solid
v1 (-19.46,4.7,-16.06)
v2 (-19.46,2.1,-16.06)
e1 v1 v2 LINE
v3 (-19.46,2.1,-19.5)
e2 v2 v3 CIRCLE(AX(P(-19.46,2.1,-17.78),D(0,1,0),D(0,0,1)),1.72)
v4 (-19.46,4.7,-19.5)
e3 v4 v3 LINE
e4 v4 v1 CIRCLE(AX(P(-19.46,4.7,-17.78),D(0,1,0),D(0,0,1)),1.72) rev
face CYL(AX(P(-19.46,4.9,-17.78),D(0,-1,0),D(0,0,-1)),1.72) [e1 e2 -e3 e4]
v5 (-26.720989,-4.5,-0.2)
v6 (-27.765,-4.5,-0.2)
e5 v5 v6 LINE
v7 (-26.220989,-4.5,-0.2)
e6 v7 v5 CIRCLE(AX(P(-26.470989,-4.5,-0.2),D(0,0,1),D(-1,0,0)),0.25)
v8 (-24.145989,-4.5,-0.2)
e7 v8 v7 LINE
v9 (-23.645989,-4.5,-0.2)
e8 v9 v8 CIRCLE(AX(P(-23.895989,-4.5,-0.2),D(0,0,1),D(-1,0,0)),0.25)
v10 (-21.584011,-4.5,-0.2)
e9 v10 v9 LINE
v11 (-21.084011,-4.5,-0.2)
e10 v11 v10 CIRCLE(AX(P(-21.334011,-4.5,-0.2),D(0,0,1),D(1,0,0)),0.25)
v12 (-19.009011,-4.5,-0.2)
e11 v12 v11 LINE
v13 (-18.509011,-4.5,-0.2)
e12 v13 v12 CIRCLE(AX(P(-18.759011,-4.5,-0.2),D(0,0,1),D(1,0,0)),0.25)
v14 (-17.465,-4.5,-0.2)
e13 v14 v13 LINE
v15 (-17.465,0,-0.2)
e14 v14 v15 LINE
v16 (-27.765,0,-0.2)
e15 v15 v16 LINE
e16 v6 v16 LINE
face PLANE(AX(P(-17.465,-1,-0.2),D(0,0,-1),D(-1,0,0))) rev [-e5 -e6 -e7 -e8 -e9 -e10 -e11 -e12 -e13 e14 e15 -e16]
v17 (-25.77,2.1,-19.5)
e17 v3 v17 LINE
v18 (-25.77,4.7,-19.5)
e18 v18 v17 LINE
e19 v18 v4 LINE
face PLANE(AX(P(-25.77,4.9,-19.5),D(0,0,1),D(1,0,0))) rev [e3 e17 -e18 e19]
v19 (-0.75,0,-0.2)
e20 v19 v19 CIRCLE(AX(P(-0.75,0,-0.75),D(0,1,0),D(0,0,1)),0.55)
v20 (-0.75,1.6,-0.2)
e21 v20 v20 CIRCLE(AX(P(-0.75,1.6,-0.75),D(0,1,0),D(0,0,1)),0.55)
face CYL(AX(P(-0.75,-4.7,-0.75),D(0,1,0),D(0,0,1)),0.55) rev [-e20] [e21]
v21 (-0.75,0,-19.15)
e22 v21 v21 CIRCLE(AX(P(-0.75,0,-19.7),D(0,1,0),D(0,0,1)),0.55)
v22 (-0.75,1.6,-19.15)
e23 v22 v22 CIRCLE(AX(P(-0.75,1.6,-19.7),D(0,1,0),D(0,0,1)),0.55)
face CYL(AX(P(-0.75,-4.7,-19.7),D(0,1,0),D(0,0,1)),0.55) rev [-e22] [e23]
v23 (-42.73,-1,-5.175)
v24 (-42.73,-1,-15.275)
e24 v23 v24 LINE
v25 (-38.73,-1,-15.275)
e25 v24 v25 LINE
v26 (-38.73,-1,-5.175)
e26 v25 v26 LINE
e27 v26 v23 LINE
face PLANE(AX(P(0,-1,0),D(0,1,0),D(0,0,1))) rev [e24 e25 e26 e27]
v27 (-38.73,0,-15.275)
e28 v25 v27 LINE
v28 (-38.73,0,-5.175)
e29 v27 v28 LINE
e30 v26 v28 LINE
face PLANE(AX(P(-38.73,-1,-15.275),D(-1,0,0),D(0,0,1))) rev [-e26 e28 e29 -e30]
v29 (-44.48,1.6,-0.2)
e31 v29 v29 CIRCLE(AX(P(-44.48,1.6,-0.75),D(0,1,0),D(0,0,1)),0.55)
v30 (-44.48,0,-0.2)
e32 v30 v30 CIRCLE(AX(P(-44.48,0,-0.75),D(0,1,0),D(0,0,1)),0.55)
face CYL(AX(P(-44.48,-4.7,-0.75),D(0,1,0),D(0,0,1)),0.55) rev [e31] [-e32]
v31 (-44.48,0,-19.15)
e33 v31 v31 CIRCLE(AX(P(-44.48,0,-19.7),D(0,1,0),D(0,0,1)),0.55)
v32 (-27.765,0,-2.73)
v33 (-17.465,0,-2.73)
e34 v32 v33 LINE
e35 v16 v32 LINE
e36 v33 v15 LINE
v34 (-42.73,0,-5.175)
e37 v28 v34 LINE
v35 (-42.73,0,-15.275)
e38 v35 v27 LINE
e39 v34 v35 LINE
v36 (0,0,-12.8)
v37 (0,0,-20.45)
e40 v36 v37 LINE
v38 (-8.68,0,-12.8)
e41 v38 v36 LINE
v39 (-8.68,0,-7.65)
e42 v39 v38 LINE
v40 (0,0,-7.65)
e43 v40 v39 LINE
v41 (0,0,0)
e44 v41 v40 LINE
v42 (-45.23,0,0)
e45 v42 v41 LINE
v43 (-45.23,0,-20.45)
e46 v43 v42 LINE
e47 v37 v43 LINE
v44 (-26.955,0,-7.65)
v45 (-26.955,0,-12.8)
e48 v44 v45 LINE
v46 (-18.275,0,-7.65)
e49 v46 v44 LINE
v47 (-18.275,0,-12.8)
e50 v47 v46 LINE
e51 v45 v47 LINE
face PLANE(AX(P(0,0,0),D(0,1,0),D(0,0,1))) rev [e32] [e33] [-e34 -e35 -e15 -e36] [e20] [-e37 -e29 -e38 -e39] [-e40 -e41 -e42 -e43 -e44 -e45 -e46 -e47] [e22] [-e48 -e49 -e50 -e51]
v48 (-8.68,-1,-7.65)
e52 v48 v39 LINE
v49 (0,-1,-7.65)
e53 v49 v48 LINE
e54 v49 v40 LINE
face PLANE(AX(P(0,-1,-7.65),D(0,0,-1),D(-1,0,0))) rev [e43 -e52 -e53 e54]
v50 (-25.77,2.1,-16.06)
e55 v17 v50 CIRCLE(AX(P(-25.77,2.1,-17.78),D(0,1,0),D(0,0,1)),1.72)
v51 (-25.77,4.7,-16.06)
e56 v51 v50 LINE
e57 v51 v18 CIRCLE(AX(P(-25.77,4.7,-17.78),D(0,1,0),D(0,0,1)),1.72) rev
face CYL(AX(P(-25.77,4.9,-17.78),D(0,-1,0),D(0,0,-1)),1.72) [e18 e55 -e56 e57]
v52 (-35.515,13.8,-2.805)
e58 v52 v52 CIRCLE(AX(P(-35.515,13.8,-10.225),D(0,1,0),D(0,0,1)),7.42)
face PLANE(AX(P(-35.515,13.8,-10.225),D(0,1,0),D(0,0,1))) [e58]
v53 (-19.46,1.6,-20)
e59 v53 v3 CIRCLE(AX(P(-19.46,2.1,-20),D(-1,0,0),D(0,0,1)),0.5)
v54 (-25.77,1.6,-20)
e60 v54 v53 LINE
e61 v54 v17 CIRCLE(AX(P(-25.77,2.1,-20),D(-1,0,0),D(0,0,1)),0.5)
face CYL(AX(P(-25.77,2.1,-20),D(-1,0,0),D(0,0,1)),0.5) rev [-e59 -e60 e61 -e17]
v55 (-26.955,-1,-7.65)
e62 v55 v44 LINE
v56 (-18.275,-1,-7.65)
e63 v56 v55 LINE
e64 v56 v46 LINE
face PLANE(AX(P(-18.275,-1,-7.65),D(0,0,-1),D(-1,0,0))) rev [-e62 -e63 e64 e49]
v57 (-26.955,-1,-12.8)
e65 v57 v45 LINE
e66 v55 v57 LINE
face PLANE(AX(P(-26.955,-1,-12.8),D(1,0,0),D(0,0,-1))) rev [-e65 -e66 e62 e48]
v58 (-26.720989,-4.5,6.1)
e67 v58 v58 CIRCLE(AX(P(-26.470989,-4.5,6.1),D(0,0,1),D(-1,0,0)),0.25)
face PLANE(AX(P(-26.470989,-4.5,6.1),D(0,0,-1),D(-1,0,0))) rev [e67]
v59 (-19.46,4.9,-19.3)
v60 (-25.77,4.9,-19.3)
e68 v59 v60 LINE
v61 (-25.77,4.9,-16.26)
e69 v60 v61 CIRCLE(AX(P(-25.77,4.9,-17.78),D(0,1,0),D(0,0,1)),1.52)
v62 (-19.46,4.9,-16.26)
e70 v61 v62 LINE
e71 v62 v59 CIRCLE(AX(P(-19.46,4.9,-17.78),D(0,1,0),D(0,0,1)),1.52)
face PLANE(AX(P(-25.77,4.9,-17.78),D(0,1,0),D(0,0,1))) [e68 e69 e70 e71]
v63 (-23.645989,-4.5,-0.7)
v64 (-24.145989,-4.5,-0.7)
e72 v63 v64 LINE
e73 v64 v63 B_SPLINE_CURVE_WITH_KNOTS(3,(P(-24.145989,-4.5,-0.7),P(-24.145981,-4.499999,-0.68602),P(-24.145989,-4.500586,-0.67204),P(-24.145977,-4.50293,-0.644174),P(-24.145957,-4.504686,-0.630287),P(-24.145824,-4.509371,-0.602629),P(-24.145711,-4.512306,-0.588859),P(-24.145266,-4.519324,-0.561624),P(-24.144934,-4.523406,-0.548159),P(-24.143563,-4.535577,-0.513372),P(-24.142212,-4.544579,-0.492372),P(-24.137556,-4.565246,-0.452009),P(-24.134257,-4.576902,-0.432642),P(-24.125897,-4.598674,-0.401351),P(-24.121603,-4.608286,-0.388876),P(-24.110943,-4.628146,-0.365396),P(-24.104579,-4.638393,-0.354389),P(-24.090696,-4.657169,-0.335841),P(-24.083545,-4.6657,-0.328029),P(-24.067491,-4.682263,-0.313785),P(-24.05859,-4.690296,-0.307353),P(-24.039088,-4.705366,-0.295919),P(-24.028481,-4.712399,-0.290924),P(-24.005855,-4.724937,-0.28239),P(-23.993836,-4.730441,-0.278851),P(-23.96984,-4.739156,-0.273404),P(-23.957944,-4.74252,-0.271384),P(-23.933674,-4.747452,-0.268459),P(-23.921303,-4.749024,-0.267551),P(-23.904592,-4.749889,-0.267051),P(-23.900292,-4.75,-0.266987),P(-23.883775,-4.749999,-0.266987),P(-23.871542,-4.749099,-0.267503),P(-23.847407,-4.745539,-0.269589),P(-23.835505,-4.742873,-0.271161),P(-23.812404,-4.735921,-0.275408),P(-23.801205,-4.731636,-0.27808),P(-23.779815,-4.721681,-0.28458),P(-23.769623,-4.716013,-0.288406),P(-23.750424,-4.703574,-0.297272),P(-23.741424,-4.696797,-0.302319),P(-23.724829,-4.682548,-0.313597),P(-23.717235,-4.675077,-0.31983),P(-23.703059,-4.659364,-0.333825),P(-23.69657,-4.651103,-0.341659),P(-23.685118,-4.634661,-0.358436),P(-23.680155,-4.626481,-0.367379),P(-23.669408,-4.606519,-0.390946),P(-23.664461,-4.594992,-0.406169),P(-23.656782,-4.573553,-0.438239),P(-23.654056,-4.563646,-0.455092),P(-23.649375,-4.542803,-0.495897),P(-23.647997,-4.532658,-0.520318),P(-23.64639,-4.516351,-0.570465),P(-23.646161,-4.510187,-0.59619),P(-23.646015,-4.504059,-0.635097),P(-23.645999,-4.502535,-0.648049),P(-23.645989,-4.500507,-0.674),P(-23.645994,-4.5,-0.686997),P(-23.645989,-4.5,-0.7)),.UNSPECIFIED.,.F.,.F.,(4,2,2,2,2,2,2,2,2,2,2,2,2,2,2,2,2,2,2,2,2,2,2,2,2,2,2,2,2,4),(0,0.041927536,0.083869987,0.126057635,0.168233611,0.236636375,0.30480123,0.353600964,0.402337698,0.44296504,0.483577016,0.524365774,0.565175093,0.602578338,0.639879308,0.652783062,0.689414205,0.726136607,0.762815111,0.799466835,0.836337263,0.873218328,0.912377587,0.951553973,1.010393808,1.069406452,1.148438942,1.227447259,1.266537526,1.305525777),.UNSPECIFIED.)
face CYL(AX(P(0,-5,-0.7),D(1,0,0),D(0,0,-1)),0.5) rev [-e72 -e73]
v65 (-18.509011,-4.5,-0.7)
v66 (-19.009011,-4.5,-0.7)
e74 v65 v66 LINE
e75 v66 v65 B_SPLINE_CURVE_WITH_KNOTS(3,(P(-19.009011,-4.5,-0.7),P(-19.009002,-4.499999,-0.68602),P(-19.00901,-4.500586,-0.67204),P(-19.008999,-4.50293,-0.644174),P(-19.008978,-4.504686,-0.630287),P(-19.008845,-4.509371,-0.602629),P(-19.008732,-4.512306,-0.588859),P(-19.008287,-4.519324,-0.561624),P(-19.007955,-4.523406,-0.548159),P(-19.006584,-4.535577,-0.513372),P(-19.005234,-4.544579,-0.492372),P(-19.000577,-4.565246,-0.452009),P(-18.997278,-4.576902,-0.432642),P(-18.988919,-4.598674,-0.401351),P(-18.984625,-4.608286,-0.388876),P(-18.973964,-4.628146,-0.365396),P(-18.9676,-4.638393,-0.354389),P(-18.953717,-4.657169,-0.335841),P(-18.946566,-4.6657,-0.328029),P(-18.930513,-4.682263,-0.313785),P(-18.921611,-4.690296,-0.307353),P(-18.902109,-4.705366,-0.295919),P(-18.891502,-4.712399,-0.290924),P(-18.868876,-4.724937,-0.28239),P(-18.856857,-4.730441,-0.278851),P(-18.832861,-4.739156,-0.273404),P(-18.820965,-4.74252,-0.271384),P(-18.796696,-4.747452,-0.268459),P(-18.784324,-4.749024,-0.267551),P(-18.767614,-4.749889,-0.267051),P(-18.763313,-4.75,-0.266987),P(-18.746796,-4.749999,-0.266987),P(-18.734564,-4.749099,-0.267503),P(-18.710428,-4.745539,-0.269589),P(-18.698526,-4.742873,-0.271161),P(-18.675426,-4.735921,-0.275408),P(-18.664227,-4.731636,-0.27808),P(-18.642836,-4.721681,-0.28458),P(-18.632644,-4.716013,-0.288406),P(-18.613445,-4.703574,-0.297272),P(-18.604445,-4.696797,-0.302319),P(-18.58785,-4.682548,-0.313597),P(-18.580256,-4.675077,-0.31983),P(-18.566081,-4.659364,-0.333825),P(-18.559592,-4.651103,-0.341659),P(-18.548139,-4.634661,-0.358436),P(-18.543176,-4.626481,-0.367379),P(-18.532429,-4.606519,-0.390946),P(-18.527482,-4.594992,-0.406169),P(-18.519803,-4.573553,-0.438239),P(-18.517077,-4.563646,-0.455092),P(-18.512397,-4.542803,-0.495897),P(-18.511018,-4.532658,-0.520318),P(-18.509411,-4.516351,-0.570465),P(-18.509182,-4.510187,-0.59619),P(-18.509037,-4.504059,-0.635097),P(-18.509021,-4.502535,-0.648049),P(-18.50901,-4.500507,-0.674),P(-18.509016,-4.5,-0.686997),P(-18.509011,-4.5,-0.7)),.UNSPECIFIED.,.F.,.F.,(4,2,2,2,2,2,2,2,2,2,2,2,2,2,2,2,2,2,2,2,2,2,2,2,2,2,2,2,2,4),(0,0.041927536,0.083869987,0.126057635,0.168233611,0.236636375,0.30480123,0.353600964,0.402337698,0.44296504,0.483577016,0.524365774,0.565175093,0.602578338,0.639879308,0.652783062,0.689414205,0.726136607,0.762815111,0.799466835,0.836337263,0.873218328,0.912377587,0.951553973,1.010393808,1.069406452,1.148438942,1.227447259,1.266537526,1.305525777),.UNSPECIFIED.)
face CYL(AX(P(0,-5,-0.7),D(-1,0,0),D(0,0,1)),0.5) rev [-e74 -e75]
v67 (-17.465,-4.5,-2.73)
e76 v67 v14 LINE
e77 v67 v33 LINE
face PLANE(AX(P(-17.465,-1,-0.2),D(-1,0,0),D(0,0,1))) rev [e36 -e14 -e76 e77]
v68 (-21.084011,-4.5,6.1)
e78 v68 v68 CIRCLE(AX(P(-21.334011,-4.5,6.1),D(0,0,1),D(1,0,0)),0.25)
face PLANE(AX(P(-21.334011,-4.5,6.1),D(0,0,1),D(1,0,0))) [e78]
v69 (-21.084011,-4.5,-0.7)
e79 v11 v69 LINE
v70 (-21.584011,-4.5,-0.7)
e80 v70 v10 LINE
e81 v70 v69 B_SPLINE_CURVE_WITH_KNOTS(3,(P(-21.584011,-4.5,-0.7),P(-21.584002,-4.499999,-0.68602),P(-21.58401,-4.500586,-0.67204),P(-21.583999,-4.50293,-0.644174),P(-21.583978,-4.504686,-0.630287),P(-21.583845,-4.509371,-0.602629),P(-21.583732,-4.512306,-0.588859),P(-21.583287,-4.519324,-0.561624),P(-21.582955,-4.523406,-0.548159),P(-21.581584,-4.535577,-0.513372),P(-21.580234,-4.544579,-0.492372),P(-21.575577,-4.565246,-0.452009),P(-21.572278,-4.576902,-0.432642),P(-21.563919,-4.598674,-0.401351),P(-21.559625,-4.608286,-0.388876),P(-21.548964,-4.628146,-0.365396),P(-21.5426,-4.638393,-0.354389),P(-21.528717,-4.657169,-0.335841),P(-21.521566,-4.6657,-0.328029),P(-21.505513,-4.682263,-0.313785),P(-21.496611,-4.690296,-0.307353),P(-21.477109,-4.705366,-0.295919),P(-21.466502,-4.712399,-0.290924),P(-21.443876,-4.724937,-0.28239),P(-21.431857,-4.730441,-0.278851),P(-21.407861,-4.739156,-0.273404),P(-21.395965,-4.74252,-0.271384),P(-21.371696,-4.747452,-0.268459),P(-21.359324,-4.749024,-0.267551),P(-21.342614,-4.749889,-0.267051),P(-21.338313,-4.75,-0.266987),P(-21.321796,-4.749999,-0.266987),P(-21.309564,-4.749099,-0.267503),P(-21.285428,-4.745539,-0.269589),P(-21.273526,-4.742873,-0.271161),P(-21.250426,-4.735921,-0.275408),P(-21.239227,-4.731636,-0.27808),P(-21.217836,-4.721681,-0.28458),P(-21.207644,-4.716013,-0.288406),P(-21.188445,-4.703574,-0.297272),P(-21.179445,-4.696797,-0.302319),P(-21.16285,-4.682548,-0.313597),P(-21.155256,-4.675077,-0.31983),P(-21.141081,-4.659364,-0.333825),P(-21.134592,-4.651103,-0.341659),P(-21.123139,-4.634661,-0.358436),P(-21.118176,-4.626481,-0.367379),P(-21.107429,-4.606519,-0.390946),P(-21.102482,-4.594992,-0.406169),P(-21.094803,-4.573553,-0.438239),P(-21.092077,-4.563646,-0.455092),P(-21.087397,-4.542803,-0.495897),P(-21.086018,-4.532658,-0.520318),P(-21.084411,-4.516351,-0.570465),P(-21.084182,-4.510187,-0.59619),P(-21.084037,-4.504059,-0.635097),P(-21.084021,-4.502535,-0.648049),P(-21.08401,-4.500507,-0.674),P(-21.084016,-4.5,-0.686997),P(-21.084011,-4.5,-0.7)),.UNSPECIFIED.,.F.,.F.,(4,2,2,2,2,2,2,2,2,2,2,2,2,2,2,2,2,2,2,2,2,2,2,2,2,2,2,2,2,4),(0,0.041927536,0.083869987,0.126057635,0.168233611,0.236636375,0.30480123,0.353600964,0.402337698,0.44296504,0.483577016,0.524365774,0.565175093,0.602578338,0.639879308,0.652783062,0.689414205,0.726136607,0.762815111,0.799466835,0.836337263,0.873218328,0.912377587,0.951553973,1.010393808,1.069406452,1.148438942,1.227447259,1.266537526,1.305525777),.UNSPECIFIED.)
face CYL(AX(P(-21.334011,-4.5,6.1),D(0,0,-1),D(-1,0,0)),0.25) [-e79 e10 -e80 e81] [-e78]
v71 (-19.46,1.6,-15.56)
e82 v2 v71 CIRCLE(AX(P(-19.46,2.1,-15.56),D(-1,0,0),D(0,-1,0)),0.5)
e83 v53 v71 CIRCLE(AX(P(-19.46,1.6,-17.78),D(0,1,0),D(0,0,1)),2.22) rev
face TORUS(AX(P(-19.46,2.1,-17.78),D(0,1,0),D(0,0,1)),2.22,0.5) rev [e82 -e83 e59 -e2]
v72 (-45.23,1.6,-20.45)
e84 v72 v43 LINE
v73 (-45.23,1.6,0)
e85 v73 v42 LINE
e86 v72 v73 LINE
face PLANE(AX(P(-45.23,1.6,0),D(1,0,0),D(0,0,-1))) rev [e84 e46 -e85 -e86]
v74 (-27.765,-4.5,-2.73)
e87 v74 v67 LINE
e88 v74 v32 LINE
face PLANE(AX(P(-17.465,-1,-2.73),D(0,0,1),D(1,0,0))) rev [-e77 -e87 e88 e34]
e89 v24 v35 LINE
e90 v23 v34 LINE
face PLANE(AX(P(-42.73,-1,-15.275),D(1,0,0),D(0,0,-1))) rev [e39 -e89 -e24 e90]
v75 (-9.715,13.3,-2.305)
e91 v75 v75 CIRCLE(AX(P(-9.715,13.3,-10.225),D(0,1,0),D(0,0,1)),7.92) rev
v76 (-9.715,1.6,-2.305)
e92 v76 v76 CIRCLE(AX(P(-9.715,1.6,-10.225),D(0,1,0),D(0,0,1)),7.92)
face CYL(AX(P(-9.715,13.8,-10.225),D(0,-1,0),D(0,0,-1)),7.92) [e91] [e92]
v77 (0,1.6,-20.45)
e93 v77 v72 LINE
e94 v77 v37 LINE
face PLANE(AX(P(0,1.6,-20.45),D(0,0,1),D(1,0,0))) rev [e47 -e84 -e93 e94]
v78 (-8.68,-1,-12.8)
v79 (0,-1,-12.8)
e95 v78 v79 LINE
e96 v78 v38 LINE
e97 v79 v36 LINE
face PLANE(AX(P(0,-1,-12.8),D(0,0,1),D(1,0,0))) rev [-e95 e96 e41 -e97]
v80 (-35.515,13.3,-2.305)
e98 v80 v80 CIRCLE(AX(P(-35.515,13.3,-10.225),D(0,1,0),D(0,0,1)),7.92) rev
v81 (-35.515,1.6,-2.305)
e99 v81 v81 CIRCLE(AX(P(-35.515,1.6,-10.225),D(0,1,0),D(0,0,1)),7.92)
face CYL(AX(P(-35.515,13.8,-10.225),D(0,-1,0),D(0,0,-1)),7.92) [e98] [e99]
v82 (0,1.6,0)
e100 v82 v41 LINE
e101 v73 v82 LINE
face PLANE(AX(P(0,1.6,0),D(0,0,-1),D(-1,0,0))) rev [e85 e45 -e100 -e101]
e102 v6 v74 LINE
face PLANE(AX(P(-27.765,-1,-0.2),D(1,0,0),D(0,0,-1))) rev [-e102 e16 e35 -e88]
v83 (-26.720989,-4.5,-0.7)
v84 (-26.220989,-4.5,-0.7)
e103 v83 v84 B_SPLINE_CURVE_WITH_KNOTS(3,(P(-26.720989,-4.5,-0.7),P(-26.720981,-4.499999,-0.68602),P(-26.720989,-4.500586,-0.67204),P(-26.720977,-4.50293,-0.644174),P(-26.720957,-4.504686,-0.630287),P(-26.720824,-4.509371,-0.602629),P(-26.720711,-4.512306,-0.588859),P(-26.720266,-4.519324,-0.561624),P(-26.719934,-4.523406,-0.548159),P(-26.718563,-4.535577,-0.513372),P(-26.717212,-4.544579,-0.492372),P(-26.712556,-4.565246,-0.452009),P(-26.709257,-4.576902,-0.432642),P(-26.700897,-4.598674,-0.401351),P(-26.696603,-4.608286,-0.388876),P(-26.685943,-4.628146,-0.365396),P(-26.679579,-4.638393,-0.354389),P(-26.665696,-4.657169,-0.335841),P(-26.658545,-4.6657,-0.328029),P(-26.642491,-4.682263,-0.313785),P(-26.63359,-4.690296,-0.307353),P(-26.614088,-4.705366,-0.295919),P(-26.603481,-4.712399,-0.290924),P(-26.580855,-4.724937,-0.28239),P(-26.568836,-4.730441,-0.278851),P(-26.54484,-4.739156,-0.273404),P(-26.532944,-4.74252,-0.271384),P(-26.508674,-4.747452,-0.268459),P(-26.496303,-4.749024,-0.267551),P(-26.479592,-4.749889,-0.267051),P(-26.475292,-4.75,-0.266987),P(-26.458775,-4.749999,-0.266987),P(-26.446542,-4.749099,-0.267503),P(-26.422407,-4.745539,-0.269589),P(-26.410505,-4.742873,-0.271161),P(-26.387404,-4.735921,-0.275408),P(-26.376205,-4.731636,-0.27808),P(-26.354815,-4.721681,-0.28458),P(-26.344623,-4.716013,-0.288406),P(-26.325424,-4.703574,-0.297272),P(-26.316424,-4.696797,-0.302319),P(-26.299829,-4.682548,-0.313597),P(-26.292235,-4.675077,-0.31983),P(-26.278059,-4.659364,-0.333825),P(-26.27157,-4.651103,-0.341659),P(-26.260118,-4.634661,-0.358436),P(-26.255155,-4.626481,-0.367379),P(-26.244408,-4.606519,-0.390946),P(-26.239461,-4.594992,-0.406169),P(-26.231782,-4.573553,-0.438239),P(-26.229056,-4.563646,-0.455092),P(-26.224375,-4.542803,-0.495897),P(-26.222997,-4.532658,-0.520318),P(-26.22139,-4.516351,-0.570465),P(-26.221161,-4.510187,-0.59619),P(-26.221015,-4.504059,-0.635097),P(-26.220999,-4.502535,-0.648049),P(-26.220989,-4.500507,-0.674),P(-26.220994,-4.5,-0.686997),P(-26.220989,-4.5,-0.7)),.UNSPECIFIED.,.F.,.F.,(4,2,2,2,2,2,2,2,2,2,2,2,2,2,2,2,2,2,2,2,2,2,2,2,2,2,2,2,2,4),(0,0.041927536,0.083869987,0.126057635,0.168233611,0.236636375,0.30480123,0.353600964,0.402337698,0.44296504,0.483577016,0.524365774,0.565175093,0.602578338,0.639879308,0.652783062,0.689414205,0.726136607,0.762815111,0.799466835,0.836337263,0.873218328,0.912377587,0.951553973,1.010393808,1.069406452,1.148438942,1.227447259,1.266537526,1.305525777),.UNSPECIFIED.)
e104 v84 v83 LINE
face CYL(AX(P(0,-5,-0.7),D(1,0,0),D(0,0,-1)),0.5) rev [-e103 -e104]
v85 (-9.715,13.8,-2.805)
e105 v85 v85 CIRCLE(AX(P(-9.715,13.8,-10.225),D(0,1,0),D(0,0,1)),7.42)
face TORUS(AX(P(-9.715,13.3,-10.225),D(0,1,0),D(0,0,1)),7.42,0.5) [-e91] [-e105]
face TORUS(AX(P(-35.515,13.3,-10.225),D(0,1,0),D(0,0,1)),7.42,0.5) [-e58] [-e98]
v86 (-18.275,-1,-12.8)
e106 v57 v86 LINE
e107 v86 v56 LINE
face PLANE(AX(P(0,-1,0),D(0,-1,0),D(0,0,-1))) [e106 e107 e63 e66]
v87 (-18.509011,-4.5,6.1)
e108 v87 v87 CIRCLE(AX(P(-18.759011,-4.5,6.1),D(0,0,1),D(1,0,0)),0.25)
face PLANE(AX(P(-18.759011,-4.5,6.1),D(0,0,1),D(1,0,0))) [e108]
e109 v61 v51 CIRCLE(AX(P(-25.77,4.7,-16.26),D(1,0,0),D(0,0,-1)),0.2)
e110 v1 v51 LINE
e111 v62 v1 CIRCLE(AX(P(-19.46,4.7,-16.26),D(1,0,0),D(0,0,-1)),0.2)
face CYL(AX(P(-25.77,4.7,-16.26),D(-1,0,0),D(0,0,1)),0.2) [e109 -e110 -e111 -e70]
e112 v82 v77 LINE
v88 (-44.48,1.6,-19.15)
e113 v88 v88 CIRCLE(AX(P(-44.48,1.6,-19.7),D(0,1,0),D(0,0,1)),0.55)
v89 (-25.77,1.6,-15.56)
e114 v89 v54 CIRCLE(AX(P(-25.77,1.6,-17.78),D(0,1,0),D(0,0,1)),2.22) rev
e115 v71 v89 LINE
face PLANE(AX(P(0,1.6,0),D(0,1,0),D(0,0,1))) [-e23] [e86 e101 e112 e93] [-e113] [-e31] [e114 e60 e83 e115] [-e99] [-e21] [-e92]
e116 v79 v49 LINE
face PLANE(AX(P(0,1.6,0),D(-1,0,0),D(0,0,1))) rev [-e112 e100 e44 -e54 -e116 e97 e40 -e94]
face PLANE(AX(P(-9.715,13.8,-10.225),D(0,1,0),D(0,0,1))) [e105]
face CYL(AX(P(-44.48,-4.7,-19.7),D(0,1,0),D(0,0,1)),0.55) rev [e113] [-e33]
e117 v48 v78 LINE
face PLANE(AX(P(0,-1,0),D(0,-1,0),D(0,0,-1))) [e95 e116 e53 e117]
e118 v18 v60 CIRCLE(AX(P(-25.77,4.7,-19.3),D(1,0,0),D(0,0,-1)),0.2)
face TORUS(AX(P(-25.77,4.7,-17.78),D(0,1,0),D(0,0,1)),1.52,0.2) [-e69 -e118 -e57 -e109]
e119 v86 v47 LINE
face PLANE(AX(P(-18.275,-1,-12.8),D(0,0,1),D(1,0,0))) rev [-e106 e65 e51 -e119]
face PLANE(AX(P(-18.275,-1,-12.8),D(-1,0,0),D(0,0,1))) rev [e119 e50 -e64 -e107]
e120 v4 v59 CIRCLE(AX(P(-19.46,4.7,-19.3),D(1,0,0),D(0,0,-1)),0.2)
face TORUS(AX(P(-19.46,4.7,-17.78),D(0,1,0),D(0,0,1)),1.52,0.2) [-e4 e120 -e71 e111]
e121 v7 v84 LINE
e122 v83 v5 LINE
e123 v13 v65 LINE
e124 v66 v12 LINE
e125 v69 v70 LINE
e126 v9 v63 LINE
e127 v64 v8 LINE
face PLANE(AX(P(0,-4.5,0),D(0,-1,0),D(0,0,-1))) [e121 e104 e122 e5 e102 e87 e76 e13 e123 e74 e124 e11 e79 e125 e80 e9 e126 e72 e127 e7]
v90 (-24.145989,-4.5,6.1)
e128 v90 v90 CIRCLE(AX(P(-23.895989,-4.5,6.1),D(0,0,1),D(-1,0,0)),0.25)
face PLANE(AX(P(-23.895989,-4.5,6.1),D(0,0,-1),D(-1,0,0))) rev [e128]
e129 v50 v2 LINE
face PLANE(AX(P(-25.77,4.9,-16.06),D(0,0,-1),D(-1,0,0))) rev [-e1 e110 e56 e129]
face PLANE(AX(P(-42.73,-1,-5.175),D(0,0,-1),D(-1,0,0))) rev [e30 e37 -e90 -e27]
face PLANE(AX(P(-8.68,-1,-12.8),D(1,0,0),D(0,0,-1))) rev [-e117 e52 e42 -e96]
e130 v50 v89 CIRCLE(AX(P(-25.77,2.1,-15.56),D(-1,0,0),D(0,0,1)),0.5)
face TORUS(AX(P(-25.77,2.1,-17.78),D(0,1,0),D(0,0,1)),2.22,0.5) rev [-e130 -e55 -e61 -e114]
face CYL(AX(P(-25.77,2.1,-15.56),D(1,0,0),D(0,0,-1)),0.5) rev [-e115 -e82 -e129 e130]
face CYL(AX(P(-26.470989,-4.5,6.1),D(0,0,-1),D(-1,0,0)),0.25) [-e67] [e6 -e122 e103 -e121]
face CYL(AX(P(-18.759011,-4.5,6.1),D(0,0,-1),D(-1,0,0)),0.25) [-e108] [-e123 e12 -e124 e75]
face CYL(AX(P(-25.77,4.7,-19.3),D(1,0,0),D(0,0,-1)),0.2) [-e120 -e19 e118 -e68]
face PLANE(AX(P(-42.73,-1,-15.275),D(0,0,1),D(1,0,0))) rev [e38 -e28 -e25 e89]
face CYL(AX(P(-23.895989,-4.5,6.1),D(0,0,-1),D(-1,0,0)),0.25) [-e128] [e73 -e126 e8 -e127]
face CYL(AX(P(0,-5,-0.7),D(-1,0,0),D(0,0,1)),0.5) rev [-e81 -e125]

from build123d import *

# Parameters (mm, degrees)
SKETCH1_W           = 45.23
SKETCH1_H           = 20.45
BOSS_EXTRUDE1_DEPTH = 1.6
SKETCH2_R           = 7.92
BOSS_EXTRUDE2_DEPTH = 12.2
BOSS_EXTRUDE3_DEPTH = 3.3
SKETCH4_W           = 4
SKETCH4_H           = 10.1
SKETCH4_W_2         = 8.68
SKETCH4_H_2         = 5.15
SKETCH4_W_3         = 10.3
SKETCH4_H_3         = 2.53
BOSS_EXTRUDE4_DEPTH = 1
SKETCH5_W           = 10.3
SKETCH5_H           = 2.53
BOSS_EXTRUDE5_DEPTH = 3.5
SKETCH6_R           = 0.25
BOSS_EXTRUDE6_DEPTH = 6.3
FILLET1_R           = 0.5
FILLET2_R           = 0.5
FILLET3_R           = 0.2
FILLET4_R           = 0.5
SKETCH7_R           = 0.55
CUT_EXTRUDE1_DEPTH  = 6.3


with BuildPart() as part:
    # Sketch1 → Boss-Extrude1 (new body)
    with BuildSketch(Plane(origin=(0, 0, 0), x_dir=(1, 0, 0), z_dir=(0, 1, 0))):
        with Locations((-22.615, 10.225)):
            Rectangle(SKETCH1_W, SKETCH1_H)
    extrude(amount=BOSS_EXTRUDE1_DEPTH)

    # Sketch2 → Boss-Extrude2 (add)
    with BuildSketch(Plane(origin=(0, 1.6, 0), x_dir=(1, 0, 0), z_dir=(0, 1, 0))):
        with Locations(Location((-35.515, 10.225, 0), (0, 0, 270))):
            Circle(SKETCH2_R)
        with Locations(Location((-9.715, 10.225, 0), (0, 0, 270))):
            Circle(SKETCH2_R)
    extrude(amount=BOSS_EXTRUDE2_DEPTH)

    # Sketch3 → Boss-Extrude3 (add)
    with BuildSketch(Plane(origin=(0, 1.6, 0), x_dir=(1, 0, 0), z_dir=(0, 1, 0))):
        with BuildLine():
            Line((-25.77, 19.5), (-19.46, 19.5))
            ThreePointArc((-19.46, 19.5), (-17.74, 17.78), (-19.46, 16.06))
            Line((-19.46, 16.06), (-25.77, 16.06))
            ThreePointArc((-25.77, 16.06), (-27.49, 17.78), (-25.77, 19.5))
        make_face()
    extrude(amount=BOSS_EXTRUDE3_DEPTH)

    # Sketch4 → Boss-Extrude4 (add)
    with BuildSketch(Plane.XZ):
        with Locations((-40.73, -10.225)):
            Rectangle(SKETCH4_W, SKETCH4_H)
        with Locations((-22.615, -10.225)):
            Rectangle(SKETCH4_W_2, SKETCH4_H_2)
        with Locations((-4.34, -10.225)):
            Rectangle(SKETCH4_W_2, SKETCH4_H_2)
        with Locations((-22.615, -1.465)):
            Rectangle(SKETCH4_W_3, SKETCH4_H_3)
    extrude(amount=BOSS_EXTRUDE4_DEPTH)

    # Sketch5 → Boss-Extrude5 (add)
    with BuildSketch(Plane.XZ.offset(1)):
        with Locations((-22.615, -1.465)):
            Rectangle(SKETCH5_W, SKETCH5_H)
    extrude(amount=BOSS_EXTRUDE5_DEPTH)

    # Sketch6 → Boss-Extrude6 (add)
    with BuildSketch(Plane.XY.offset(-0.2)):
        with Locations((-21.334010663, -4.5)):
            Circle(SKETCH6_R)
        with Locations((-18.759010663, -4.5)):
            Circle(SKETCH6_R)
        with Locations(Location((-23.895989337, -4.5, 0), (0, 0, 180))):
            Circle(SKETCH6_R)
        with Locations(Location((-26.470989337, -4.5, 0), (0, 0, 180))):
            Circle(SKETCH6_R)
    extrude(amount=BOSS_EXTRUDE6_DEPTH)

    # Fillet1
    # the kernel refuses this fillet: 0.5 mm, written as the material it adds along each edge
    with BuildSketch(Plane(origin=(-24.970989337, -4.5, -0.2), x_dir=(0, 0, -1), z_dir=(-1, 0, 0))) as fillet1_piece_1_section:
        with BuildLine():
            CenterArc((FILLET1_R, FILLET1_R), FILLET1_R, 180, 90)
            Line((0, FILLET1_R), (0, 0))
            Line((0, 0), (FILLET1_R, 0))
        make_face()
    fillet1_piece_1 = extrude(amount=3, mode=Mode.PRIVATE)
    fillet1_piece_1 = fillet1_piece_1 & Plane(origin=(-26.470989337, -4.5, -0.330121351), x_dir=(-1, 0, 0), z_dir=(0, 0, -1)) * Cylinder(0.25, 8, mode=Mode.PRIVATE)
    add(fillet1_piece_1)
    with BuildSketch(Plane(origin=(-22.395989337, -4.5, -0.2), x_dir=(0, 0, -1), z_dir=(-1, 0, 0))) as fillet1_piece_2_section:
        with BuildLine():
            CenterArc((FILLET1_R, FILLET1_R), FILLET1_R, 180, 90)
            Line((0, FILLET1_R), (0, 0))
            Line((0, 0), (FILLET1_R, 0))
        make_face()
    fillet1_piece_2 = extrude(amount=3, mode=Mode.PRIVATE)
    fillet1_piece_2 = fillet1_piece_2 & Plane(origin=(-23.895989337, -4.5, -0.330121351), x_dir=(-1, 0, 0), z_dir=(0, 0, -1)) * Cylinder(0.25, 8, mode=Mode.PRIVATE)
    add(fillet1_piece_2)
    with BuildSketch(Plane(origin=(-19.834010663, -4.5, -0.2), x_dir=(0, 0, -1), z_dir=(-1, 0, 0))) as fillet1_piece_3_section:
        with BuildLine():
            CenterArc((FILLET1_R, FILLET1_R), FILLET1_R, 180, 90)
            Line((0, FILLET1_R), (0, 0))
            Line((0, 0), (FILLET1_R, 0))
        make_face()
    fillet1_piece_3 = extrude(amount=3, mode=Mode.PRIVATE)
    fillet1_piece_3 = fillet1_piece_3 & Plane(origin=(-21.334010663, -4.5, -0.330121598), x_dir=(1, 0, 0), z_dir=(0, 0, -1)) * Cylinder(0.25, 8, mode=Mode.PRIVATE)
    add(fillet1_piece_3)
    with BuildSketch(Plane(origin=(-17.259010663, -4.5, -0.2), x_dir=(0, 0, -1), z_dir=(-1, 0, 0))) as fillet1_piece_4_section:
        with BuildLine():
            CenterArc((FILLET1_R, FILLET1_R), FILLET1_R, 180, 90)
            Line((0, FILLET1_R), (0, 0))
            Line((0, 0), (FILLET1_R, 0))
        make_face()
    fillet1_piece_4 = extrude(amount=3, mode=Mode.PRIVATE)
    fillet1_piece_4 = fillet1_piece_4 & Plane(origin=(-18.759010663, -4.5, -0.330121598), x_dir=(1, 0, 0), z_dir=(0, 0, -1)) * Cylinder(0.25, 8, mode=Mode.PRIVATE)
    add(fillet1_piece_4)

    # Fillet2
    fillet2_edges = [part.edges().sort_by_distance(p)[0] for p in [
        (-35.515, 13.8, -18.145),
        (-9.715, 13.8, -18.145),
    ]]
    fillet(fillet2_edges, radius=FILLET2_R)

    # Fillet3
    fillet3_edges = [part.edges().sort_by_distance(p)[0] for p in [
        (-27.49, 4.9, -17.78),
        (-22.615, 4.9, -16.06),
        (-17.74, 4.9, -17.78),
        (-22.615, 4.9, -19.5),
    ]]
    fillet(fillet3_edges, radius=FILLET3_R)

    # Fillet4
    fillet4_edges = [part.edges().sort_by_distance(p)[0] for p in [
        (-27.49, 1.6, -17.78),
        (-22.615, 1.6, -16.06),
        (-17.74, 1.6, -17.78),
        (-22.615, 1.6, -19.5),
    ]]
    fillet(fillet4_edges, radius=FILLET4_R)

    # Sketch7 → Cut-Extrude1 (cut)
    with BuildSketch(Plane(origin=(0, 1.6, 0), x_dir=(1, 0, 0), z_dir=(0, 1, 0))):
        with Locations(Location((-44.48, 19.7, 0), (0, 0, 270))):
            Circle(SKETCH7_R)
        with Locations(Location((-44.48, 0.75, 0), (0, 0, 270))):
            Circle(SKETCH7_R)
        with Locations(Location((-0.75, 0.75, 0), (0, 0, 270))):
            Circle(SKETCH7_R)
        with Locations(Location((-0.75, 19.7, 0), (0, 0, 270))):
            Circle(SKETCH7_R)
    extrude(amount=-CUT_EXTRUDE1_DEPTH, mode=Mode.SUBTRACT)


solid = part.part
